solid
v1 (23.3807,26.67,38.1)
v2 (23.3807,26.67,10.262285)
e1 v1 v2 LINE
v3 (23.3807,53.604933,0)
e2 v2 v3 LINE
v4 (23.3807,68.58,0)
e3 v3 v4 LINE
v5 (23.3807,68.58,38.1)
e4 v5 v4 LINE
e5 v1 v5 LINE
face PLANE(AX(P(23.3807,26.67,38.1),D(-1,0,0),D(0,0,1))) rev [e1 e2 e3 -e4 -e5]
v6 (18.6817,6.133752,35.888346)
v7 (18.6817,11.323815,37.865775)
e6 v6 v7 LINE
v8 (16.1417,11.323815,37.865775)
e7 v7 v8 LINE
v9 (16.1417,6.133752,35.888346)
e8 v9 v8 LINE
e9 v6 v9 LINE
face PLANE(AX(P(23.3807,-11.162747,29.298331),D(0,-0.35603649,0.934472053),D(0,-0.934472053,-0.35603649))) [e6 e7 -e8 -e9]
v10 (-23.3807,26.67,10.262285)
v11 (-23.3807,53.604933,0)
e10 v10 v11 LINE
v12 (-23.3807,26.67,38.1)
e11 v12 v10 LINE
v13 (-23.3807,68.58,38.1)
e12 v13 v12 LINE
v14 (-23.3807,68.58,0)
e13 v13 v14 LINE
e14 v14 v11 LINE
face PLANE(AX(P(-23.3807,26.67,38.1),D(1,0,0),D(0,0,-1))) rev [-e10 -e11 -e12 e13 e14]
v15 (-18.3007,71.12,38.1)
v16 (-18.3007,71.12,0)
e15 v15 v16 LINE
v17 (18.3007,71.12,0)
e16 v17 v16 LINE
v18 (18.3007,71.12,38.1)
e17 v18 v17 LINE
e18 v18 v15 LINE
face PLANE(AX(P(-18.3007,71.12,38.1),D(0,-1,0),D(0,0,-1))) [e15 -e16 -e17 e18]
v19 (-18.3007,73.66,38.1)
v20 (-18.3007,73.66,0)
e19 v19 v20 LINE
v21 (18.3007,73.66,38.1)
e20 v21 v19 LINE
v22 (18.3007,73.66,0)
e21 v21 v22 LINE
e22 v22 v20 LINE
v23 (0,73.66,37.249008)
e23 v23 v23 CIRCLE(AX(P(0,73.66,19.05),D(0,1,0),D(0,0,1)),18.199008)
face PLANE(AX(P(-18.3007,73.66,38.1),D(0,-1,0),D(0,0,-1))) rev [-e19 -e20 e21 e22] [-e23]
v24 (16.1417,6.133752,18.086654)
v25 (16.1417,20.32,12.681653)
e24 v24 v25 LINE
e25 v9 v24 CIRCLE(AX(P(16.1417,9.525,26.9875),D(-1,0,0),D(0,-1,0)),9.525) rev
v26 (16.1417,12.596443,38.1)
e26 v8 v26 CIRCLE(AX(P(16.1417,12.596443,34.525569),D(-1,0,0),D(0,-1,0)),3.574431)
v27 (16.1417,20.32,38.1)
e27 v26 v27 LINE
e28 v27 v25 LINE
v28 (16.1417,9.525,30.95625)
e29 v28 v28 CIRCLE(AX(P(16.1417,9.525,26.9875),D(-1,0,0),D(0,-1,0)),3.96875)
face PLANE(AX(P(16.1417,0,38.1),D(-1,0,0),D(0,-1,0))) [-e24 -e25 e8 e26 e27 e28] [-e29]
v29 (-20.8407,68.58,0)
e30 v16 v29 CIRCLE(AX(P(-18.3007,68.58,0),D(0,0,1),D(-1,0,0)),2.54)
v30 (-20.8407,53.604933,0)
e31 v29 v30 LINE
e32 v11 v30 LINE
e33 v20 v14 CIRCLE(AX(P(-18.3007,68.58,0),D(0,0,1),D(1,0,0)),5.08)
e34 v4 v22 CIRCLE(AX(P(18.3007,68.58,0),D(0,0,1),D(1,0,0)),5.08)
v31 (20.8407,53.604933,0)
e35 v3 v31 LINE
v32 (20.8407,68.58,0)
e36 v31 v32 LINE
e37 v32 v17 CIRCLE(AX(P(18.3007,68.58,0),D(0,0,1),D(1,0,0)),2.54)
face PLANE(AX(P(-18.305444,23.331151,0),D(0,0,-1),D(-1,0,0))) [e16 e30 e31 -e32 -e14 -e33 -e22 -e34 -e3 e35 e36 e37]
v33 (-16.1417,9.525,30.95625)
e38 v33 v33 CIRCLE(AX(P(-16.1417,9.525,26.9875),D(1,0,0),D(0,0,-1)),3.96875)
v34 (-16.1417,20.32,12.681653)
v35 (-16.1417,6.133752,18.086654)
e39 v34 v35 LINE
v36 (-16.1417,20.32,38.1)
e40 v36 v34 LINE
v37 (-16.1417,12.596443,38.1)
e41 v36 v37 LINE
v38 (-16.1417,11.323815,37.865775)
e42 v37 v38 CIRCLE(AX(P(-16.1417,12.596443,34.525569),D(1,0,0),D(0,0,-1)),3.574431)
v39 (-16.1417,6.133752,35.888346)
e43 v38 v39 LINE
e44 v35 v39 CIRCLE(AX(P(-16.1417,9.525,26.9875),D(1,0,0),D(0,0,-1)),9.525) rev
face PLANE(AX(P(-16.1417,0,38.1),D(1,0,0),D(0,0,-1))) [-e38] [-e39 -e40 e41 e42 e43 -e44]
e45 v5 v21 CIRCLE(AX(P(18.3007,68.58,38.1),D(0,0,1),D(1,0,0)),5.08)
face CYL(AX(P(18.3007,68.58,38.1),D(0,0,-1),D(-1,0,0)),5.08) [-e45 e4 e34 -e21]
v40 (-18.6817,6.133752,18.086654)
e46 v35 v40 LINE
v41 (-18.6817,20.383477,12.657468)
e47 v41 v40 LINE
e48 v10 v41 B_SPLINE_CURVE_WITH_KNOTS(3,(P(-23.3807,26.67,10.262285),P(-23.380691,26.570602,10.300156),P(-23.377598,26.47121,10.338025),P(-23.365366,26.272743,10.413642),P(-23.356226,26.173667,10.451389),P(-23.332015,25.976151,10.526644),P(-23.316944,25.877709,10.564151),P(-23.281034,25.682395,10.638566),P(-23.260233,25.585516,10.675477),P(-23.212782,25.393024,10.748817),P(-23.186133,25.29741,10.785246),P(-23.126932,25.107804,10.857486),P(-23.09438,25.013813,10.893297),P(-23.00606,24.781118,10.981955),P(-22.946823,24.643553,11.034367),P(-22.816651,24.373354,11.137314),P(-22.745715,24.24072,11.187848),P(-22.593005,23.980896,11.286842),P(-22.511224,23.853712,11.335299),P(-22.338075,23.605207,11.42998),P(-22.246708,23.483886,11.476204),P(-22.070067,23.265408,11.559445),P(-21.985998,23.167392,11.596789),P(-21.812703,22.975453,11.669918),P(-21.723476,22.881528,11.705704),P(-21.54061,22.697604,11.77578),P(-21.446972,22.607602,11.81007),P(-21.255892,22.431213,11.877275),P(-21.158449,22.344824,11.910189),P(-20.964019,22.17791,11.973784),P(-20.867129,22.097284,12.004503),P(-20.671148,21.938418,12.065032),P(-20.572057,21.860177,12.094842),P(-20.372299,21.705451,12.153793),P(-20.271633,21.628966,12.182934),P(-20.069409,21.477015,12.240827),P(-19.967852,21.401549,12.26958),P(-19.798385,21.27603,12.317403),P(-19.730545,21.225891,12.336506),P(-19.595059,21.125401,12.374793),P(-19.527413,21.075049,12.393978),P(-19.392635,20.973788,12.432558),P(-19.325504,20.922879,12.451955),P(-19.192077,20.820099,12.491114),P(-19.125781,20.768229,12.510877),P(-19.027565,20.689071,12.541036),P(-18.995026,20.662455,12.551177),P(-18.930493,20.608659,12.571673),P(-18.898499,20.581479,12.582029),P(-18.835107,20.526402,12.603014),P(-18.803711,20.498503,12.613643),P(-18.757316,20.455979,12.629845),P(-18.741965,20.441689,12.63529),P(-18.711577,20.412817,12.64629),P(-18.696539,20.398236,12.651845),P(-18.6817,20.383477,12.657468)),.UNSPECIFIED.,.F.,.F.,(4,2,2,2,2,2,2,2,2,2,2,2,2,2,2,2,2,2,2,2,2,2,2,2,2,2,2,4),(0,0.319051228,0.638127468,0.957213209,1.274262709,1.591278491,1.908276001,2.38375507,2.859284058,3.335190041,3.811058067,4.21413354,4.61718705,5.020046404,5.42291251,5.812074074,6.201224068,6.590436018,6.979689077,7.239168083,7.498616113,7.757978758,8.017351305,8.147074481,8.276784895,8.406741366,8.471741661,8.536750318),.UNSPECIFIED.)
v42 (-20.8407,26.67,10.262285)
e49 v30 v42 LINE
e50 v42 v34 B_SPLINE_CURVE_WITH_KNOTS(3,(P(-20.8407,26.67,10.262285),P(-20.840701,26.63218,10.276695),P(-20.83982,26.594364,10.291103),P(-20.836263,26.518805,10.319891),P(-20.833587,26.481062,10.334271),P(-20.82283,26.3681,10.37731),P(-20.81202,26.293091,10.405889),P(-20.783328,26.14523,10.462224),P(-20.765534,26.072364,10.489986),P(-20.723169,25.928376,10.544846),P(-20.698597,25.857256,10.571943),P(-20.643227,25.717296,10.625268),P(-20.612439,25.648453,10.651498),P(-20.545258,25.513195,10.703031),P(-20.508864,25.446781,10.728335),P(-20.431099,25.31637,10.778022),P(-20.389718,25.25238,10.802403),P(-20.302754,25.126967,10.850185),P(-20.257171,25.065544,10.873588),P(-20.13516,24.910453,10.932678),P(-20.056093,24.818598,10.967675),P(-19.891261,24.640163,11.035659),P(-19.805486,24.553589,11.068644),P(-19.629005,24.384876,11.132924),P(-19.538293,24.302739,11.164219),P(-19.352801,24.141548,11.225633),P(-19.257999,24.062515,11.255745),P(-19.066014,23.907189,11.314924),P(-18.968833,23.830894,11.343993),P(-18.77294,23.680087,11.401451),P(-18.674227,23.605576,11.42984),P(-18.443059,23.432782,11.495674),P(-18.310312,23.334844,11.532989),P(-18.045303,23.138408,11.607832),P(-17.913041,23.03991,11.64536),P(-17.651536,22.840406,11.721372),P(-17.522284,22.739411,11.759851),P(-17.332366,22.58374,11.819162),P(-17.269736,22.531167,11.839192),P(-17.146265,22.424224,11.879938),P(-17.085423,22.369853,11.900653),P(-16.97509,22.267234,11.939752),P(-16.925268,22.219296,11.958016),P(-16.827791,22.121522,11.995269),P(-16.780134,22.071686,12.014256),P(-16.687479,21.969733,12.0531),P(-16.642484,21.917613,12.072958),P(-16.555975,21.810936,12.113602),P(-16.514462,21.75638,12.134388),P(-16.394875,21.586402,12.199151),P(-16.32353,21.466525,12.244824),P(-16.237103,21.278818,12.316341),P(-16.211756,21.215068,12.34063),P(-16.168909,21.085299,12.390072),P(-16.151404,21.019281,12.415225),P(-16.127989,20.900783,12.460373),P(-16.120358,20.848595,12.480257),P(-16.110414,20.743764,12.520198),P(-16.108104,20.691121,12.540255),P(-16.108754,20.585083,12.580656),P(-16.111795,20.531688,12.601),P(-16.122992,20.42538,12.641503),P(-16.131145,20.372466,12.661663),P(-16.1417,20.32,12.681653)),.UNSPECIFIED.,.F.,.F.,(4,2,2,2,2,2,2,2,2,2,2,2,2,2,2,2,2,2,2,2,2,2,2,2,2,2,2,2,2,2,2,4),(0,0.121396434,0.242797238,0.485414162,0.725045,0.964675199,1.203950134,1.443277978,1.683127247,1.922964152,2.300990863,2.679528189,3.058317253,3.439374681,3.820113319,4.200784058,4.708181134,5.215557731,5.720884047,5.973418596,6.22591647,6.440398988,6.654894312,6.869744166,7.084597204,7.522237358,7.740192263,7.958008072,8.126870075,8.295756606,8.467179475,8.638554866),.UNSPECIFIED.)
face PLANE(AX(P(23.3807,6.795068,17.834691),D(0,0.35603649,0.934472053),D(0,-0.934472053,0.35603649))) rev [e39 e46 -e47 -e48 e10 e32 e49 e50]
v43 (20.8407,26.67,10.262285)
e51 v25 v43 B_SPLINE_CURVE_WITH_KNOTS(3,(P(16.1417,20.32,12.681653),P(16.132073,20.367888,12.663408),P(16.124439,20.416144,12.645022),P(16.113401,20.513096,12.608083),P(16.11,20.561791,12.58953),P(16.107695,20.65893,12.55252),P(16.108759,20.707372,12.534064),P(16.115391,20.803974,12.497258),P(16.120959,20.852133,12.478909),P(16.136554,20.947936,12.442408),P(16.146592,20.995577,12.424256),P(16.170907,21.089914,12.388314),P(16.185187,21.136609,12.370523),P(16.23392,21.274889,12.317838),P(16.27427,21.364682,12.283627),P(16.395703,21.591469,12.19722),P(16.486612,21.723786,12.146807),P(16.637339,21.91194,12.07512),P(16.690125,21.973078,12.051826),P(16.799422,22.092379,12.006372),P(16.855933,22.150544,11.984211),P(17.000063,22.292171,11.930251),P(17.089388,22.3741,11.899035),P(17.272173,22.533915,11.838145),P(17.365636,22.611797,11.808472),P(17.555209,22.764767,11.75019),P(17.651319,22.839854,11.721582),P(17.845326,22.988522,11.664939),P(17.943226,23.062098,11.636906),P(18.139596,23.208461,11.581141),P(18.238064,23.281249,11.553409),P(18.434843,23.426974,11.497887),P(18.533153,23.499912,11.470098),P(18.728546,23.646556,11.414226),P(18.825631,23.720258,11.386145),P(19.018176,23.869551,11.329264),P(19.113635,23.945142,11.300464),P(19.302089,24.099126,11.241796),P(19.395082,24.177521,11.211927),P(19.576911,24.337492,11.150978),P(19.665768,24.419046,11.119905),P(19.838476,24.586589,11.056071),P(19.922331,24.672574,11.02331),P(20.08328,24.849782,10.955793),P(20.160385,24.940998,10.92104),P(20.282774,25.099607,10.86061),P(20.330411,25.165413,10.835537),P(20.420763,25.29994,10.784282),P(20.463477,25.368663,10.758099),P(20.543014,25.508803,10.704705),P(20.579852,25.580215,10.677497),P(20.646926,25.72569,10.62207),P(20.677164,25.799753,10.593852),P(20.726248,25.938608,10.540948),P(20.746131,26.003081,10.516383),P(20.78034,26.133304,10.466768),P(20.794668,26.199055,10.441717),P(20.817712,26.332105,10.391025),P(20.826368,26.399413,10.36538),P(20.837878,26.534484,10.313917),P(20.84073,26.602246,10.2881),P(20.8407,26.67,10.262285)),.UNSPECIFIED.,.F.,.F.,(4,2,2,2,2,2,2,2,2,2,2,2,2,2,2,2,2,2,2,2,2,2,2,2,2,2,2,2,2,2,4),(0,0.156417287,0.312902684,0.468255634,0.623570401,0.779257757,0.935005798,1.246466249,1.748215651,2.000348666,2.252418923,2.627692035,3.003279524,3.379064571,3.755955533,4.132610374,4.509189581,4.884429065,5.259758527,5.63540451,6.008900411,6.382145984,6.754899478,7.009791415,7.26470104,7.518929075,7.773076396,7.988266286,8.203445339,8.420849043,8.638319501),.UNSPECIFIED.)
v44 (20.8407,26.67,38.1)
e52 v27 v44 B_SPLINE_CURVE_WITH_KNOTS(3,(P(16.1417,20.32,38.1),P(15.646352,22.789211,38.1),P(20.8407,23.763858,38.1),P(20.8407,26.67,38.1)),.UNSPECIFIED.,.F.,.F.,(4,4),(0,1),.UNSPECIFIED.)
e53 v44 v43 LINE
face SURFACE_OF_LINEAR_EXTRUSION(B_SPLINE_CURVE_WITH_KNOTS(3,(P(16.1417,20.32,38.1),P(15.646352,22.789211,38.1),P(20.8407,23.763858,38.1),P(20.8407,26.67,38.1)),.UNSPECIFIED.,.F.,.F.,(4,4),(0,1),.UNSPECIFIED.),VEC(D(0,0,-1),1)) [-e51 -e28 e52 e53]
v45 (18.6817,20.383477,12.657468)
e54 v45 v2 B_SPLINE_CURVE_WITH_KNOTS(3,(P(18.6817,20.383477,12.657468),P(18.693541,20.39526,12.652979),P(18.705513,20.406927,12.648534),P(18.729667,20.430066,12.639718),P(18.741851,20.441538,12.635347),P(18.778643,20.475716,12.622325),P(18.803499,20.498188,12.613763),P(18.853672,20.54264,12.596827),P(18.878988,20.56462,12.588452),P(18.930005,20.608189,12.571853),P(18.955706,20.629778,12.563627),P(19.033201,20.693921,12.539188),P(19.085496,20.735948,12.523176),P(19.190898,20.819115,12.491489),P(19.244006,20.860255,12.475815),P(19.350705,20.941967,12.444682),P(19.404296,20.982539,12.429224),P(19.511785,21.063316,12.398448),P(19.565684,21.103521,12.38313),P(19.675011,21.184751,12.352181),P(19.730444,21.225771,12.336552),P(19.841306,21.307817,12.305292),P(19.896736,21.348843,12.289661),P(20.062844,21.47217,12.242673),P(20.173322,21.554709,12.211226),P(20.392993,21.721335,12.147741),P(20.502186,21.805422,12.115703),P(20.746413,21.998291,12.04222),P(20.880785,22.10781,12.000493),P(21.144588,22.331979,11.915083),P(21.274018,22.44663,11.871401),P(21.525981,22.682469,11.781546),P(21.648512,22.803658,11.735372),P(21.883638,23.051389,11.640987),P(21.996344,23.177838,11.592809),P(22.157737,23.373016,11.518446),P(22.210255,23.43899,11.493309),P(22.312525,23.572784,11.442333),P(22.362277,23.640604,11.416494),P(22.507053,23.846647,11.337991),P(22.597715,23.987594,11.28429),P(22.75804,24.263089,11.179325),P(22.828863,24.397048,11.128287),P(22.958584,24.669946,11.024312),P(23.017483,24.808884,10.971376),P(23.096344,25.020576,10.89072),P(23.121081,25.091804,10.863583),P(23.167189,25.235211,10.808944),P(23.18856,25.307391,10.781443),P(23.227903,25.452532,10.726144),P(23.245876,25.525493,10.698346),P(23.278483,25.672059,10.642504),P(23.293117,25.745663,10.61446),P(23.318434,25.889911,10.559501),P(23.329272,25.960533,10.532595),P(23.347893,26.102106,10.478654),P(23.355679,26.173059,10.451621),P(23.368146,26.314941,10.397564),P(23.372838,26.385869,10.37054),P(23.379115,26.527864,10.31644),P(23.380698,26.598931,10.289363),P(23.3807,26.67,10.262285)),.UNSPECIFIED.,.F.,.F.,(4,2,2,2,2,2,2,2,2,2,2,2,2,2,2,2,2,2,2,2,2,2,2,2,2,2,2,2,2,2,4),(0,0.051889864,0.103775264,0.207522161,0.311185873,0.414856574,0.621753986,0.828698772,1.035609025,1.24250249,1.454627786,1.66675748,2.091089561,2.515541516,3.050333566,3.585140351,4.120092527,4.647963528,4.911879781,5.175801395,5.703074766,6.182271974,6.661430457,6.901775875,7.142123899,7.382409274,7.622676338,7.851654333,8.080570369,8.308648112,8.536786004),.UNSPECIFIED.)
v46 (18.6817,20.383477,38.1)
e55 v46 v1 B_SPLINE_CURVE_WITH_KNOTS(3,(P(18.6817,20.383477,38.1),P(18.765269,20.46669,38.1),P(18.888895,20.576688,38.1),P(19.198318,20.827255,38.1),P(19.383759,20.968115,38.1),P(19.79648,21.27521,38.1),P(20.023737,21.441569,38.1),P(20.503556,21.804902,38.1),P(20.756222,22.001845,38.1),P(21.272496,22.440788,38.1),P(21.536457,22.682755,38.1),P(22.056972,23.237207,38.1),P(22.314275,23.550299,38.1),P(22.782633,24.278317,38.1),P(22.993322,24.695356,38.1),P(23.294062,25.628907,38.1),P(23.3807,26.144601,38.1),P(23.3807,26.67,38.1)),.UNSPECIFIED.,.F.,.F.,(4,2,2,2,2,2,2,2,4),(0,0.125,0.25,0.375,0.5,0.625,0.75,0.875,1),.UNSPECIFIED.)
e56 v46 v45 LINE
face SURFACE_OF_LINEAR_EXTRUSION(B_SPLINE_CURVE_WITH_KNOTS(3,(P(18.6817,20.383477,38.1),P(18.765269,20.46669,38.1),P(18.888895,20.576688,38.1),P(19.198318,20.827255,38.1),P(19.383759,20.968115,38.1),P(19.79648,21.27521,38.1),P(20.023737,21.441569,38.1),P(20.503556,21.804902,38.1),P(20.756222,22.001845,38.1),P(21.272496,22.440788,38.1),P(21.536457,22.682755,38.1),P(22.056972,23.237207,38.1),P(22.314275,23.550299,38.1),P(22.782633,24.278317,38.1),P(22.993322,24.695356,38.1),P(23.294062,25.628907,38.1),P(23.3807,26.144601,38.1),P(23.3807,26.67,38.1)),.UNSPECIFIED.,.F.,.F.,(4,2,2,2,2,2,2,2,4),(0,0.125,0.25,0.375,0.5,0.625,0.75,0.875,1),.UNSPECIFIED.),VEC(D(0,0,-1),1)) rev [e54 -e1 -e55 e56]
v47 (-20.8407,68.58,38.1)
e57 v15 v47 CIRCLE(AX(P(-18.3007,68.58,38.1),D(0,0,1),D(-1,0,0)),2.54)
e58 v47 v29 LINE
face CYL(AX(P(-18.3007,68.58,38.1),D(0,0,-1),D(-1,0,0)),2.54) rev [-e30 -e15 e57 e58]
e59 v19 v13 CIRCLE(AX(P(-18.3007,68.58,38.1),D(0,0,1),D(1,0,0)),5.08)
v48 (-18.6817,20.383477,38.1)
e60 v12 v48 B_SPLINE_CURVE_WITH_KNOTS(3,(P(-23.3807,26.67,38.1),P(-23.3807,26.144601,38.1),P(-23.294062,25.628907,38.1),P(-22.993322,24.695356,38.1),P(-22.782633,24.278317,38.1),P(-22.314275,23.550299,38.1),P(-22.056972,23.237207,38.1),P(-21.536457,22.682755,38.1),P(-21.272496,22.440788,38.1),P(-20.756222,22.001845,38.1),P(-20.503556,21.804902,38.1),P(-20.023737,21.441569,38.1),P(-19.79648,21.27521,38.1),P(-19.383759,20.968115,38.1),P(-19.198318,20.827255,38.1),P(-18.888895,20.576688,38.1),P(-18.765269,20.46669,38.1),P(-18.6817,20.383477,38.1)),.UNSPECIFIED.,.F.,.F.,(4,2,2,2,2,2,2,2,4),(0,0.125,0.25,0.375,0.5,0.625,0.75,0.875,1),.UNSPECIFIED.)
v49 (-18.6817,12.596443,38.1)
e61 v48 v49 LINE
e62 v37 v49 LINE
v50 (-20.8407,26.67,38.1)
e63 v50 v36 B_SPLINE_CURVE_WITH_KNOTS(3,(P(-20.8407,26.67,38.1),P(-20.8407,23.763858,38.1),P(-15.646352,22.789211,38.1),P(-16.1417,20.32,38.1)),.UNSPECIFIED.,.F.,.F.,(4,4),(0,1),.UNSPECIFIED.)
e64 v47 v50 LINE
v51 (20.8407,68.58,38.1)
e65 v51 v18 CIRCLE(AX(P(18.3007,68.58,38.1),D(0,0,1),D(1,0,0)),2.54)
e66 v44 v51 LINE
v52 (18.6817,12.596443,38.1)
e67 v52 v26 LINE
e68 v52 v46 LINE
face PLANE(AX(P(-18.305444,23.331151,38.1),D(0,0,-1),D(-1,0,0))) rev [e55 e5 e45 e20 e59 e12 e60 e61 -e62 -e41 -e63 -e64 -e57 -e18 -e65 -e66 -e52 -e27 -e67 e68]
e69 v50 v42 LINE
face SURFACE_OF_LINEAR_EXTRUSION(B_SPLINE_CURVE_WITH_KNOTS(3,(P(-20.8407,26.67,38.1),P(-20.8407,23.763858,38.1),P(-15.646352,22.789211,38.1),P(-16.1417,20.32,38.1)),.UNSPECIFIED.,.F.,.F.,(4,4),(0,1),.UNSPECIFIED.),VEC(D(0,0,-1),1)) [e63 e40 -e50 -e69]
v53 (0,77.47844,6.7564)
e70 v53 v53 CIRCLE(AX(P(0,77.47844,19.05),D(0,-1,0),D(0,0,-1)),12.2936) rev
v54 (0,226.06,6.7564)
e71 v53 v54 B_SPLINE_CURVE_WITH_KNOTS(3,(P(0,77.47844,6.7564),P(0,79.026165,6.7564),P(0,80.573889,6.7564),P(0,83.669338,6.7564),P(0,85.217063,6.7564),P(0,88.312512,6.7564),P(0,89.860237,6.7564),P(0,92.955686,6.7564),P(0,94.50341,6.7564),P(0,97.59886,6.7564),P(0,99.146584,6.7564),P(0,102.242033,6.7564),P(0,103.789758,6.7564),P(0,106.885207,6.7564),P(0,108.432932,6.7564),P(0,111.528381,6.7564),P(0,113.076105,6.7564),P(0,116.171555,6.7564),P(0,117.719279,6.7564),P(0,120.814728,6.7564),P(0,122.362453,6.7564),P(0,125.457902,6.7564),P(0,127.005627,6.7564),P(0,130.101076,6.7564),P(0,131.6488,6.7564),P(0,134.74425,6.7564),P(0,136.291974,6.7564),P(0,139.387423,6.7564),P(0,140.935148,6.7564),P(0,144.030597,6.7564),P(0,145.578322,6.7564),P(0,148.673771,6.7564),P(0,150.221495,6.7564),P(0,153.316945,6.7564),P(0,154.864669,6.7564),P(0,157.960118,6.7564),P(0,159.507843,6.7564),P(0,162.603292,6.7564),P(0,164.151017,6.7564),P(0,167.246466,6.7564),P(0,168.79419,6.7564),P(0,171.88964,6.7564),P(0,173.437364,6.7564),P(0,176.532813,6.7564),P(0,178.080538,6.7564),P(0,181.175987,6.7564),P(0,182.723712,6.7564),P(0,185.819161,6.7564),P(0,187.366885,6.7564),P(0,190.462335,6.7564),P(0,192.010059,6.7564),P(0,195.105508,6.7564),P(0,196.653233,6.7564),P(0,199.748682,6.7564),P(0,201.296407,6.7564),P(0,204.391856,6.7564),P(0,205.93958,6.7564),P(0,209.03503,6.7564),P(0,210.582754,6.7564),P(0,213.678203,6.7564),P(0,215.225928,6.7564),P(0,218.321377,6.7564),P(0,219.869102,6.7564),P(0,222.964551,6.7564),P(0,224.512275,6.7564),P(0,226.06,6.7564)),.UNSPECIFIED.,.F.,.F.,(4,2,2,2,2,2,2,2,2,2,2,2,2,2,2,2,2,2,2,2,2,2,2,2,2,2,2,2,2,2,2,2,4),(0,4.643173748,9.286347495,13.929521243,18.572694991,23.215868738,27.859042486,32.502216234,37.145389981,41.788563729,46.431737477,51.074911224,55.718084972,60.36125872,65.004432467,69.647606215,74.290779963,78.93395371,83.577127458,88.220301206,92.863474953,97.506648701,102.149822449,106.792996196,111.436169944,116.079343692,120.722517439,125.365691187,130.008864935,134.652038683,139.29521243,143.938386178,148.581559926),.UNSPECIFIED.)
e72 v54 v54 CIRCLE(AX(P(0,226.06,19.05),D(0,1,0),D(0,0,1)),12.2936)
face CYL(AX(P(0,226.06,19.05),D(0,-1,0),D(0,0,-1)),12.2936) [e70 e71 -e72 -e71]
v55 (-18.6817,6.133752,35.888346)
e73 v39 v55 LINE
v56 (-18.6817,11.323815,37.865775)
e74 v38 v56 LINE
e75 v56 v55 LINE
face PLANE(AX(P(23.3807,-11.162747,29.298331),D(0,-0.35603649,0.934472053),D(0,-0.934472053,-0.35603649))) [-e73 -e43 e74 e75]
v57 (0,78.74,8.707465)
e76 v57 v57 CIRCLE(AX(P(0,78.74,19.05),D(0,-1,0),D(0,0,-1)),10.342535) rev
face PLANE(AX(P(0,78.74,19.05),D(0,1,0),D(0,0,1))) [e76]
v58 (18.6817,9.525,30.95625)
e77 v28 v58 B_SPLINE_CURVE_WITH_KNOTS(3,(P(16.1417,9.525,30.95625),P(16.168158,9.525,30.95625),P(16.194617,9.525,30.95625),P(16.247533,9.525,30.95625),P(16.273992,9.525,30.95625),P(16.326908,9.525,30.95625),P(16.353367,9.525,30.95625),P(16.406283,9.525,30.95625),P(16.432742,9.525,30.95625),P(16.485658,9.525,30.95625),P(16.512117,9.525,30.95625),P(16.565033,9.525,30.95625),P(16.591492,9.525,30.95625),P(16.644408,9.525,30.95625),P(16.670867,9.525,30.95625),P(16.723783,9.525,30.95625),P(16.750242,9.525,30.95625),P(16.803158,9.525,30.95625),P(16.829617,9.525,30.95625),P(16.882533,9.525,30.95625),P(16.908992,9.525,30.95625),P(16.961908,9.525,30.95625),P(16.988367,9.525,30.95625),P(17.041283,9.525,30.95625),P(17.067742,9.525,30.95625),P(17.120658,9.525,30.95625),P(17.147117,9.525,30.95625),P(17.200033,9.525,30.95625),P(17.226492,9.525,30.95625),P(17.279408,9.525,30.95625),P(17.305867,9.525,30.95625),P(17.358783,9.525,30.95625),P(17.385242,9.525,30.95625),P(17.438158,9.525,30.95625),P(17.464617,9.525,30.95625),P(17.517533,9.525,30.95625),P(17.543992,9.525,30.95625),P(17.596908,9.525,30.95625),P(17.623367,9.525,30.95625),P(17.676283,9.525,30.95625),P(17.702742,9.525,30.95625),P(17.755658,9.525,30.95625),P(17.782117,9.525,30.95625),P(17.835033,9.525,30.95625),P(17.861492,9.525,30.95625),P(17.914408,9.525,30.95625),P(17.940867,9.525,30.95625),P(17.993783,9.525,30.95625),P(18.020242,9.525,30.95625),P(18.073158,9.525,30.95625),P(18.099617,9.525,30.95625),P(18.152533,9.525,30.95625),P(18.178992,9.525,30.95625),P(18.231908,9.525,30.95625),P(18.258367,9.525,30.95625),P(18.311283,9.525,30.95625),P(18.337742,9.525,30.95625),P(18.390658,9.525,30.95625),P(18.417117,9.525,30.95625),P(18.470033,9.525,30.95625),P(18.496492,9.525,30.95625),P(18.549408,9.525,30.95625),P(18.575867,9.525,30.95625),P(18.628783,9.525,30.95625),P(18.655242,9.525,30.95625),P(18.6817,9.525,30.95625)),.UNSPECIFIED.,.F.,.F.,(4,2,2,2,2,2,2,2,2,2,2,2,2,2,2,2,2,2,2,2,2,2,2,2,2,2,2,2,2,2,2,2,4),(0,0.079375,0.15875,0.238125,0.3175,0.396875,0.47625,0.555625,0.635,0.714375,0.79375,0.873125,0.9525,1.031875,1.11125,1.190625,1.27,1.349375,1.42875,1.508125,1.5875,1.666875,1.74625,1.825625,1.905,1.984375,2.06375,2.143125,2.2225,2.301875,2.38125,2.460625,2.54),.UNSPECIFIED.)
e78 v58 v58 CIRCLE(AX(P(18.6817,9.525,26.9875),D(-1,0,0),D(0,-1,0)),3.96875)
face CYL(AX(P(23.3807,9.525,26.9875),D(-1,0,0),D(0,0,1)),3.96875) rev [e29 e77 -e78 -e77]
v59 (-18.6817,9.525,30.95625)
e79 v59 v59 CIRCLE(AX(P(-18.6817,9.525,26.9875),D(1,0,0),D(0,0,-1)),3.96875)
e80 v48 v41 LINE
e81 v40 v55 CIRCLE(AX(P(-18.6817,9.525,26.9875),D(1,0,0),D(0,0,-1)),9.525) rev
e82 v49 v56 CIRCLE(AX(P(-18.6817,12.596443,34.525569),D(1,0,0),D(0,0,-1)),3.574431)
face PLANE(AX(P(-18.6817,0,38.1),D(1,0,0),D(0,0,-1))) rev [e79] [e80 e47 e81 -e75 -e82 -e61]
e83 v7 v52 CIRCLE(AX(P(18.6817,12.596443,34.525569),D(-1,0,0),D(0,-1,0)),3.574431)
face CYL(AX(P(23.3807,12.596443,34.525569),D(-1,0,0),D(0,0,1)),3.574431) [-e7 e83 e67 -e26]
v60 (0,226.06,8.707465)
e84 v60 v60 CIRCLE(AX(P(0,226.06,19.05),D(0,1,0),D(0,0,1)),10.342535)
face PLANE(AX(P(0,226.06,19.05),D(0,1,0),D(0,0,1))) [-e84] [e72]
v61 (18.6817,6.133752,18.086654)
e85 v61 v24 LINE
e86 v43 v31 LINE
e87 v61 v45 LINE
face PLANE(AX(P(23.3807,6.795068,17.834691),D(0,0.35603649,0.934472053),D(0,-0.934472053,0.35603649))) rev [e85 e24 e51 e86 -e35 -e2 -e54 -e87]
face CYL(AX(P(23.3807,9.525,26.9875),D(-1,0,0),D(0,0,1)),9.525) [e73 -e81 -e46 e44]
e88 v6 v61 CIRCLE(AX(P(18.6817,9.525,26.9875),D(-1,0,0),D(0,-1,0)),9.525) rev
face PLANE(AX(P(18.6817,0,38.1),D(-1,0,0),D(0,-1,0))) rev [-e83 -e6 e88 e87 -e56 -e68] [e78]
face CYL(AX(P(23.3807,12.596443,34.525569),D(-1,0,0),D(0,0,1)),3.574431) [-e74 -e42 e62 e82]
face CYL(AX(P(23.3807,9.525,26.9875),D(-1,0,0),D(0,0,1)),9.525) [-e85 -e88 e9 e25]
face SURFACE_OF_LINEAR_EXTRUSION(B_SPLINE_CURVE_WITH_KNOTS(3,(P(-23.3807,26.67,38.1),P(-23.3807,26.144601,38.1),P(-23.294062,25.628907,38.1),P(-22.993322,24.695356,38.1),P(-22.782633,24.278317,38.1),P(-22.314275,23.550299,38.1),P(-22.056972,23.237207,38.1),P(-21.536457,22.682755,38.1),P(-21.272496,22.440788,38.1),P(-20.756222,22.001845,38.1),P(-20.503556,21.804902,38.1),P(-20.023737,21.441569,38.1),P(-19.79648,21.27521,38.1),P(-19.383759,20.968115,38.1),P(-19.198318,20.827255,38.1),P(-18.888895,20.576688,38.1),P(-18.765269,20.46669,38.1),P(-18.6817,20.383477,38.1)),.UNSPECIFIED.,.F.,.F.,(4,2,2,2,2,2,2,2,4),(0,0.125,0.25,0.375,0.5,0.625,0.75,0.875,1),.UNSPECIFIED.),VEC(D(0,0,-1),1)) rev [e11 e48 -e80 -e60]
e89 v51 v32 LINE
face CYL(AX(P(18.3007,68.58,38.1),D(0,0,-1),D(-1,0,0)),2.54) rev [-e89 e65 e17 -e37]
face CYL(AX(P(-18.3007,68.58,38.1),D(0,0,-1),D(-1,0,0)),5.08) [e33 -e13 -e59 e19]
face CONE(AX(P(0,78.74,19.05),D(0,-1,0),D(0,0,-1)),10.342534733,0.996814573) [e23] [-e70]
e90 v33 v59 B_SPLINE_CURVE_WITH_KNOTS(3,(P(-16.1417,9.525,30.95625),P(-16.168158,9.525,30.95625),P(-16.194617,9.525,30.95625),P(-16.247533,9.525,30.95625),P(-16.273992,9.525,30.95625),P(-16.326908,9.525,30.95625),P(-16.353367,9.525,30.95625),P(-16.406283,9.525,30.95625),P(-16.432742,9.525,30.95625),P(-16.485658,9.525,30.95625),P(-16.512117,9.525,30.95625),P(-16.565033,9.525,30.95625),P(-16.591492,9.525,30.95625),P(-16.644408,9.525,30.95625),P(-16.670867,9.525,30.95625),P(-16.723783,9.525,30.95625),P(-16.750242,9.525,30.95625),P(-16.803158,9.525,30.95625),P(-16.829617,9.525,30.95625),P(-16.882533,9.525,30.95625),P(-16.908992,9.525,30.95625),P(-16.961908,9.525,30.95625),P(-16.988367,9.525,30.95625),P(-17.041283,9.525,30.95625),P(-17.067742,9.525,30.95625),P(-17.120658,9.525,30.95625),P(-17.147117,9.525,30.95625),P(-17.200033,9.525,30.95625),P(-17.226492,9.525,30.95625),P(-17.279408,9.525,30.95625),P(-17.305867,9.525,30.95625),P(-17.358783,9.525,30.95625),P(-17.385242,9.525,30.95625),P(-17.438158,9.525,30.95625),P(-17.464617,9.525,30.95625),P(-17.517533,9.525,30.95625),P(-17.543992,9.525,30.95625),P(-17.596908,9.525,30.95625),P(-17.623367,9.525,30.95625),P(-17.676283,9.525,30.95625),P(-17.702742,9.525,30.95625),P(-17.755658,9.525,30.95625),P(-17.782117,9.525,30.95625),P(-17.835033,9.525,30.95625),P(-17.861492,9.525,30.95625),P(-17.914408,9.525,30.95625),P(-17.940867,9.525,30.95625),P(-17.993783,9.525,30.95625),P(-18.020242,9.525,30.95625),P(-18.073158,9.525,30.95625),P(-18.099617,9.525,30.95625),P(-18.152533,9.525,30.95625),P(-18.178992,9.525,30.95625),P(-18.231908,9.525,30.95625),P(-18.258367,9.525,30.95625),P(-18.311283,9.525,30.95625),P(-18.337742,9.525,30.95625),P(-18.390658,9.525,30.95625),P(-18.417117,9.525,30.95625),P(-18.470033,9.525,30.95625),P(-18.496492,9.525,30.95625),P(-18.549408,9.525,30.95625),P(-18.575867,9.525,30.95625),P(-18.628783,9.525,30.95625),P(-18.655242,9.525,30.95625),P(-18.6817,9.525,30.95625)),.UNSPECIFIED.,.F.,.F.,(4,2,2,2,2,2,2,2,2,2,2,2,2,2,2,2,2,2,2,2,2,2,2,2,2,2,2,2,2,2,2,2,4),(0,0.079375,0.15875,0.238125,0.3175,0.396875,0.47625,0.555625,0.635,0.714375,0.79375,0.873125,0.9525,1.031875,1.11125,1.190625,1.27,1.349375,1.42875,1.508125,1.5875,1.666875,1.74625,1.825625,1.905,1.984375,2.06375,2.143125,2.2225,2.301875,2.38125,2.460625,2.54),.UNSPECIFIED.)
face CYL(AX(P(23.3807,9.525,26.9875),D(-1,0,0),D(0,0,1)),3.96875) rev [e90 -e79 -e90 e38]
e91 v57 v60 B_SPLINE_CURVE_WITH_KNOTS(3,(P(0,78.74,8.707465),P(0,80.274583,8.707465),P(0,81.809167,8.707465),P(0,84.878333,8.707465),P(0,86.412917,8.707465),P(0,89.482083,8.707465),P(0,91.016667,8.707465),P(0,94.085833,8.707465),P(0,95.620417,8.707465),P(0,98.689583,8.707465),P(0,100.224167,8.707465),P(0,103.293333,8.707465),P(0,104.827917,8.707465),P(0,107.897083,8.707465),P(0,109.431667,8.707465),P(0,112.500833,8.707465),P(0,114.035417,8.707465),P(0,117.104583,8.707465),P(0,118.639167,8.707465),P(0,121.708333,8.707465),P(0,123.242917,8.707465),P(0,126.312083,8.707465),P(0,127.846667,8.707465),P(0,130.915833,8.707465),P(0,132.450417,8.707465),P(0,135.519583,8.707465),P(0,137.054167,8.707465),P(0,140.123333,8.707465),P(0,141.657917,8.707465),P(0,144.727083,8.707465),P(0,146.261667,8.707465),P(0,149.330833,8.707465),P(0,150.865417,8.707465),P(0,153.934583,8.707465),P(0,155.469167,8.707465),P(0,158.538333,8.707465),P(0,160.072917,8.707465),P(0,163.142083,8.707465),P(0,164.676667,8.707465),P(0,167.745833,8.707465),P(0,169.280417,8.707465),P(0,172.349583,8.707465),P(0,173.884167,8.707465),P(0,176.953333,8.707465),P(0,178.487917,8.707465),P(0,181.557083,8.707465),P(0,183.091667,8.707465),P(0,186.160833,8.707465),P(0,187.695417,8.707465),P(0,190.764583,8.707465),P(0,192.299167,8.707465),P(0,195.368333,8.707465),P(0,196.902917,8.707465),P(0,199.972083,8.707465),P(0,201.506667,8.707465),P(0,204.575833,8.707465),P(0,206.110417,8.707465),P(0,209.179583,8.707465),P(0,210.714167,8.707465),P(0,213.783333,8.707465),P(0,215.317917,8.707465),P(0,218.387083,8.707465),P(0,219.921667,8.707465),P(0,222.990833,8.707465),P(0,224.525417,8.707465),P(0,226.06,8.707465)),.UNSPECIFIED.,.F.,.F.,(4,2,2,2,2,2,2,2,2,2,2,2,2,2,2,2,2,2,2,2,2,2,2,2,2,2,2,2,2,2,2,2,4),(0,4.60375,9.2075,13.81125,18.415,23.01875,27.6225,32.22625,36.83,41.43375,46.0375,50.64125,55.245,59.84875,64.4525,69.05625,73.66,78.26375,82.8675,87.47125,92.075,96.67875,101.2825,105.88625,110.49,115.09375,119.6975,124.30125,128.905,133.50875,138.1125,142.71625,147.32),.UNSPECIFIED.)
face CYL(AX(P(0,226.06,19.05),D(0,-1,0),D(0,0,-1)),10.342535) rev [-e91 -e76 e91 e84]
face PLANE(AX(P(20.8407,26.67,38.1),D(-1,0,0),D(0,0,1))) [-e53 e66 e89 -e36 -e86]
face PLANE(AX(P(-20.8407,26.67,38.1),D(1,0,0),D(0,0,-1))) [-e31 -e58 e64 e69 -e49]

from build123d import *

# Parameters (mm, degrees)
EXTRUDE_THIN1_DEPTH = 38.1
CUT_EXTRUDE1_DEPTH  = 96.205221294
SKETCH5_R           = 3.96875
CUT_EXTRUDE2_DEPTH  = 96.205221294
SKETCH6_R           = 12.2936
SKETCH6_R_2         = 10.342534733
BOSS_EXTRUDE2_DEPTH = 152.4
SKETCH8_R           = 18.199007784
SKETCH7_R           = 10.342534733


# Read off the part's stored shape, not the designer's step: Extrude-Thin1
with BuildPart() as part:
    # Extrude-Thin1 outline → Extrude-Thin1 (new body)
    with BuildSketch(Plane.XY):
        with BuildLine():
            Line((-18.6817, 20.38347688), (-18.6817, 0))
            Line((-18.6817, 0), (-16.1417, 0))
            Line((-16.1417, 0), (-16.1417, 20.32))
            add(Edge.make_bspline(
                [(-20.8407, 26.67), (-20.8407, 23.763857752), (-15.646351535, 22.789211476), (-16.1417, 20.32)],
                knots=[0, 0, 0, 0, 1, 1, 1, 1], degree=3))
            Line((-20.8407, 26.67), (-20.8407, 68.58))
            ThreePointArc((-20.8407, 68.58), (-20.096751224, 70.376051224), (-18.3007, 71.12))
            Line((-18.3007, 71.12), (18.3007, 71.12))
            ThreePointArc((18.3007, 71.12), (20.096751224, 70.376051224), (20.8407, 68.58))
            Line((20.8407, 68.58), (20.8407, 26.67))
            add(Edge.make_bspline(
                [(16.1417, 20.32), (15.646351535, 22.789211476), (20.8407, 23.763857752), (20.8407, 26.67)],
                knots=[0, 0, 0, 0, 1, 1, 1, 1], degree=3))
            Line((16.1417, 20.32), (16.1417, 0))
            Line((16.1417, 0), (18.6817, 0))
            Line((18.6817, 0), (18.6817, 20.38347688))
            add(Edge.make_bspline(
                [(18.6817, 20.38347688), (18.765268898, 20.466690468), (18.888895007, 20.57668849), (19.198318415, 20.827254502), (19.383759179, 20.968114578), (19.796479851, 21.275209729), (20.023736725, 21.441568971), (20.503556211, 21.804901686), (20.7562224, 22.001844549), (21.272496014, 22.440788491), (21.53645688, 22.68275476), (22.056971887, 23.237206576), (22.314275473, 23.550298766), (22.782632726, 24.278317238), (22.993321794, 24.695356067), (23.294062312, 25.62890672), (23.3807, 26.144600529), (23.3807, 26.67)],
                knots=[0, 0, 0, 0, 0.125, 0.125, 0.25, 0.25, 0.375, 0.375, 0.5, 0.5, 0.625, 0.625, 0.75, 0.75, 0.875, 0.875, 1, 1, 1, 1], degree=3))
            Line((23.3807, 26.67), (23.3807, 68.58))
            ThreePointArc((23.3807, 68.58), (21.892802448, 72.172102448), (18.3007, 73.66))
            Line((18.3007, 73.66), (-18.3007, 73.66))
            ThreePointArc((-18.3007, 73.66), (-21.892802448, 72.172102448), (-23.3807, 68.58))
            Line((-23.3807, 68.58), (-23.3807, 26.67))
            add(Edge.make_bspline(
                [(-23.3807, 26.67), (-23.3807, 26.144600529), (-23.294062312, 25.62890672), (-22.993321794, 24.695356067), (-22.782632726, 24.278317238), (-22.314275473, 23.550298766), (-22.056971887, 23.237206576), (-21.53645688, 22.68275476), (-21.272496014, 22.440788491), (-20.7562224, 22.001844549), (-20.503556211, 21.804901686), (-20.023736725, 21.441568971), (-19.796479851, 21.275209729), (-19.383759179, 20.968114578), (-19.198318415, 20.827254502), (-18.888895007, 20.57668849), (-18.765268898, 20.466690468), (-18.6817, 20.38347688)],
                knots=[0, 0, 0, 0, 0.125, 0.125, 0.25, 0.25, 0.375, 0.375, 0.5, 0.5, 0.625, 0.625, 0.75, 0.75, 0.875, 0.875, 1, 1, 1, 1], degree=3))
        make_face()
    extrude(amount=EXTRUDE_THIN1_DEPTH)

    # Sketch3 → Cut-Extrude1 (cut, through all)
    with BuildSketch(Plane.ZY.offset(23.3807)):
        with BuildLine():
            Line((18.086653696, 6.133752432), (0, 53.604932722))
            Line((0, 53.604932722), (0, 0))
            Line((0, 0), (26.9875, 0))
            ThreePointArc((26.9875, 0), (21.582687704, 1.681937521), (18.086653696, 6.133752432))
        make_face()
        with BuildLine():
            ThreePointArc((35.888346304, 6.133752432), (32.392312296, 1.681937521), (26.9875, 0))
            Line((26.9875, 0), (38.1, 0))
            Line((38.1, 0), (38.1, 12.596443014))
            ThreePointArc((38.1, 12.596443014), (38.040956068, 11.949441708), (37.865774898, 11.323815275))
            Line((37.865774898, 11.323815275), (35.888346304, 6.133752432))
        make_face()
    extrude(amount=-CUT_EXTRUDE1_DEPTH, mode=Mode.SUBTRACT)

    # Sketch5 → Cut-Extrude2 (cut, through all)
    with BuildSketch(Plane.ZY.offset(23.3807)):
        with Locations((26.9875, 9.525)):
            Circle(SKETCH5_R)
    extrude(amount=-CUT_EXTRUDE2_DEPTH, mode=Mode.SUBTRACT)

    # Sketch6 → Boss-Extrude2 (add)
    with BuildSketch(Plane(origin=(0, 73.66, 0), x_dir=(1, 0, 0), z_dir=(0, 1, 0))):
        with Locations(Location((0, -19.05, 0), (0, 0, 90))):
            Circle(SKETCH6_R)
        with Locations(Location((0, -19.05, 0), (0, 0, 90))):
            Circle(SKETCH6_R_2, mode=Mode.SUBTRACT)
    extrude(amount=BOSS_EXTRUDE2_DEPTH)

    # Sketch8 → Loft2 section 0
    with BuildSketch(Plane(origin=(0, 73.66, 0), x_dir=(1, 0, 0), z_dir=(0, 1, 0))):
        with Locations((0, -19.05)):
            Circle(SKETCH8_R)
    # Sketch7 → Loft2 section 1
    with BuildSketch(Plane(origin=(0, 78.74, 0), x_dir=(1, 0, 0), z_dir=(0, 1, 0))):
        with Locations((0, -19.05)):
            Circle(SKETCH7_R)
    loft()


solid = part.part
